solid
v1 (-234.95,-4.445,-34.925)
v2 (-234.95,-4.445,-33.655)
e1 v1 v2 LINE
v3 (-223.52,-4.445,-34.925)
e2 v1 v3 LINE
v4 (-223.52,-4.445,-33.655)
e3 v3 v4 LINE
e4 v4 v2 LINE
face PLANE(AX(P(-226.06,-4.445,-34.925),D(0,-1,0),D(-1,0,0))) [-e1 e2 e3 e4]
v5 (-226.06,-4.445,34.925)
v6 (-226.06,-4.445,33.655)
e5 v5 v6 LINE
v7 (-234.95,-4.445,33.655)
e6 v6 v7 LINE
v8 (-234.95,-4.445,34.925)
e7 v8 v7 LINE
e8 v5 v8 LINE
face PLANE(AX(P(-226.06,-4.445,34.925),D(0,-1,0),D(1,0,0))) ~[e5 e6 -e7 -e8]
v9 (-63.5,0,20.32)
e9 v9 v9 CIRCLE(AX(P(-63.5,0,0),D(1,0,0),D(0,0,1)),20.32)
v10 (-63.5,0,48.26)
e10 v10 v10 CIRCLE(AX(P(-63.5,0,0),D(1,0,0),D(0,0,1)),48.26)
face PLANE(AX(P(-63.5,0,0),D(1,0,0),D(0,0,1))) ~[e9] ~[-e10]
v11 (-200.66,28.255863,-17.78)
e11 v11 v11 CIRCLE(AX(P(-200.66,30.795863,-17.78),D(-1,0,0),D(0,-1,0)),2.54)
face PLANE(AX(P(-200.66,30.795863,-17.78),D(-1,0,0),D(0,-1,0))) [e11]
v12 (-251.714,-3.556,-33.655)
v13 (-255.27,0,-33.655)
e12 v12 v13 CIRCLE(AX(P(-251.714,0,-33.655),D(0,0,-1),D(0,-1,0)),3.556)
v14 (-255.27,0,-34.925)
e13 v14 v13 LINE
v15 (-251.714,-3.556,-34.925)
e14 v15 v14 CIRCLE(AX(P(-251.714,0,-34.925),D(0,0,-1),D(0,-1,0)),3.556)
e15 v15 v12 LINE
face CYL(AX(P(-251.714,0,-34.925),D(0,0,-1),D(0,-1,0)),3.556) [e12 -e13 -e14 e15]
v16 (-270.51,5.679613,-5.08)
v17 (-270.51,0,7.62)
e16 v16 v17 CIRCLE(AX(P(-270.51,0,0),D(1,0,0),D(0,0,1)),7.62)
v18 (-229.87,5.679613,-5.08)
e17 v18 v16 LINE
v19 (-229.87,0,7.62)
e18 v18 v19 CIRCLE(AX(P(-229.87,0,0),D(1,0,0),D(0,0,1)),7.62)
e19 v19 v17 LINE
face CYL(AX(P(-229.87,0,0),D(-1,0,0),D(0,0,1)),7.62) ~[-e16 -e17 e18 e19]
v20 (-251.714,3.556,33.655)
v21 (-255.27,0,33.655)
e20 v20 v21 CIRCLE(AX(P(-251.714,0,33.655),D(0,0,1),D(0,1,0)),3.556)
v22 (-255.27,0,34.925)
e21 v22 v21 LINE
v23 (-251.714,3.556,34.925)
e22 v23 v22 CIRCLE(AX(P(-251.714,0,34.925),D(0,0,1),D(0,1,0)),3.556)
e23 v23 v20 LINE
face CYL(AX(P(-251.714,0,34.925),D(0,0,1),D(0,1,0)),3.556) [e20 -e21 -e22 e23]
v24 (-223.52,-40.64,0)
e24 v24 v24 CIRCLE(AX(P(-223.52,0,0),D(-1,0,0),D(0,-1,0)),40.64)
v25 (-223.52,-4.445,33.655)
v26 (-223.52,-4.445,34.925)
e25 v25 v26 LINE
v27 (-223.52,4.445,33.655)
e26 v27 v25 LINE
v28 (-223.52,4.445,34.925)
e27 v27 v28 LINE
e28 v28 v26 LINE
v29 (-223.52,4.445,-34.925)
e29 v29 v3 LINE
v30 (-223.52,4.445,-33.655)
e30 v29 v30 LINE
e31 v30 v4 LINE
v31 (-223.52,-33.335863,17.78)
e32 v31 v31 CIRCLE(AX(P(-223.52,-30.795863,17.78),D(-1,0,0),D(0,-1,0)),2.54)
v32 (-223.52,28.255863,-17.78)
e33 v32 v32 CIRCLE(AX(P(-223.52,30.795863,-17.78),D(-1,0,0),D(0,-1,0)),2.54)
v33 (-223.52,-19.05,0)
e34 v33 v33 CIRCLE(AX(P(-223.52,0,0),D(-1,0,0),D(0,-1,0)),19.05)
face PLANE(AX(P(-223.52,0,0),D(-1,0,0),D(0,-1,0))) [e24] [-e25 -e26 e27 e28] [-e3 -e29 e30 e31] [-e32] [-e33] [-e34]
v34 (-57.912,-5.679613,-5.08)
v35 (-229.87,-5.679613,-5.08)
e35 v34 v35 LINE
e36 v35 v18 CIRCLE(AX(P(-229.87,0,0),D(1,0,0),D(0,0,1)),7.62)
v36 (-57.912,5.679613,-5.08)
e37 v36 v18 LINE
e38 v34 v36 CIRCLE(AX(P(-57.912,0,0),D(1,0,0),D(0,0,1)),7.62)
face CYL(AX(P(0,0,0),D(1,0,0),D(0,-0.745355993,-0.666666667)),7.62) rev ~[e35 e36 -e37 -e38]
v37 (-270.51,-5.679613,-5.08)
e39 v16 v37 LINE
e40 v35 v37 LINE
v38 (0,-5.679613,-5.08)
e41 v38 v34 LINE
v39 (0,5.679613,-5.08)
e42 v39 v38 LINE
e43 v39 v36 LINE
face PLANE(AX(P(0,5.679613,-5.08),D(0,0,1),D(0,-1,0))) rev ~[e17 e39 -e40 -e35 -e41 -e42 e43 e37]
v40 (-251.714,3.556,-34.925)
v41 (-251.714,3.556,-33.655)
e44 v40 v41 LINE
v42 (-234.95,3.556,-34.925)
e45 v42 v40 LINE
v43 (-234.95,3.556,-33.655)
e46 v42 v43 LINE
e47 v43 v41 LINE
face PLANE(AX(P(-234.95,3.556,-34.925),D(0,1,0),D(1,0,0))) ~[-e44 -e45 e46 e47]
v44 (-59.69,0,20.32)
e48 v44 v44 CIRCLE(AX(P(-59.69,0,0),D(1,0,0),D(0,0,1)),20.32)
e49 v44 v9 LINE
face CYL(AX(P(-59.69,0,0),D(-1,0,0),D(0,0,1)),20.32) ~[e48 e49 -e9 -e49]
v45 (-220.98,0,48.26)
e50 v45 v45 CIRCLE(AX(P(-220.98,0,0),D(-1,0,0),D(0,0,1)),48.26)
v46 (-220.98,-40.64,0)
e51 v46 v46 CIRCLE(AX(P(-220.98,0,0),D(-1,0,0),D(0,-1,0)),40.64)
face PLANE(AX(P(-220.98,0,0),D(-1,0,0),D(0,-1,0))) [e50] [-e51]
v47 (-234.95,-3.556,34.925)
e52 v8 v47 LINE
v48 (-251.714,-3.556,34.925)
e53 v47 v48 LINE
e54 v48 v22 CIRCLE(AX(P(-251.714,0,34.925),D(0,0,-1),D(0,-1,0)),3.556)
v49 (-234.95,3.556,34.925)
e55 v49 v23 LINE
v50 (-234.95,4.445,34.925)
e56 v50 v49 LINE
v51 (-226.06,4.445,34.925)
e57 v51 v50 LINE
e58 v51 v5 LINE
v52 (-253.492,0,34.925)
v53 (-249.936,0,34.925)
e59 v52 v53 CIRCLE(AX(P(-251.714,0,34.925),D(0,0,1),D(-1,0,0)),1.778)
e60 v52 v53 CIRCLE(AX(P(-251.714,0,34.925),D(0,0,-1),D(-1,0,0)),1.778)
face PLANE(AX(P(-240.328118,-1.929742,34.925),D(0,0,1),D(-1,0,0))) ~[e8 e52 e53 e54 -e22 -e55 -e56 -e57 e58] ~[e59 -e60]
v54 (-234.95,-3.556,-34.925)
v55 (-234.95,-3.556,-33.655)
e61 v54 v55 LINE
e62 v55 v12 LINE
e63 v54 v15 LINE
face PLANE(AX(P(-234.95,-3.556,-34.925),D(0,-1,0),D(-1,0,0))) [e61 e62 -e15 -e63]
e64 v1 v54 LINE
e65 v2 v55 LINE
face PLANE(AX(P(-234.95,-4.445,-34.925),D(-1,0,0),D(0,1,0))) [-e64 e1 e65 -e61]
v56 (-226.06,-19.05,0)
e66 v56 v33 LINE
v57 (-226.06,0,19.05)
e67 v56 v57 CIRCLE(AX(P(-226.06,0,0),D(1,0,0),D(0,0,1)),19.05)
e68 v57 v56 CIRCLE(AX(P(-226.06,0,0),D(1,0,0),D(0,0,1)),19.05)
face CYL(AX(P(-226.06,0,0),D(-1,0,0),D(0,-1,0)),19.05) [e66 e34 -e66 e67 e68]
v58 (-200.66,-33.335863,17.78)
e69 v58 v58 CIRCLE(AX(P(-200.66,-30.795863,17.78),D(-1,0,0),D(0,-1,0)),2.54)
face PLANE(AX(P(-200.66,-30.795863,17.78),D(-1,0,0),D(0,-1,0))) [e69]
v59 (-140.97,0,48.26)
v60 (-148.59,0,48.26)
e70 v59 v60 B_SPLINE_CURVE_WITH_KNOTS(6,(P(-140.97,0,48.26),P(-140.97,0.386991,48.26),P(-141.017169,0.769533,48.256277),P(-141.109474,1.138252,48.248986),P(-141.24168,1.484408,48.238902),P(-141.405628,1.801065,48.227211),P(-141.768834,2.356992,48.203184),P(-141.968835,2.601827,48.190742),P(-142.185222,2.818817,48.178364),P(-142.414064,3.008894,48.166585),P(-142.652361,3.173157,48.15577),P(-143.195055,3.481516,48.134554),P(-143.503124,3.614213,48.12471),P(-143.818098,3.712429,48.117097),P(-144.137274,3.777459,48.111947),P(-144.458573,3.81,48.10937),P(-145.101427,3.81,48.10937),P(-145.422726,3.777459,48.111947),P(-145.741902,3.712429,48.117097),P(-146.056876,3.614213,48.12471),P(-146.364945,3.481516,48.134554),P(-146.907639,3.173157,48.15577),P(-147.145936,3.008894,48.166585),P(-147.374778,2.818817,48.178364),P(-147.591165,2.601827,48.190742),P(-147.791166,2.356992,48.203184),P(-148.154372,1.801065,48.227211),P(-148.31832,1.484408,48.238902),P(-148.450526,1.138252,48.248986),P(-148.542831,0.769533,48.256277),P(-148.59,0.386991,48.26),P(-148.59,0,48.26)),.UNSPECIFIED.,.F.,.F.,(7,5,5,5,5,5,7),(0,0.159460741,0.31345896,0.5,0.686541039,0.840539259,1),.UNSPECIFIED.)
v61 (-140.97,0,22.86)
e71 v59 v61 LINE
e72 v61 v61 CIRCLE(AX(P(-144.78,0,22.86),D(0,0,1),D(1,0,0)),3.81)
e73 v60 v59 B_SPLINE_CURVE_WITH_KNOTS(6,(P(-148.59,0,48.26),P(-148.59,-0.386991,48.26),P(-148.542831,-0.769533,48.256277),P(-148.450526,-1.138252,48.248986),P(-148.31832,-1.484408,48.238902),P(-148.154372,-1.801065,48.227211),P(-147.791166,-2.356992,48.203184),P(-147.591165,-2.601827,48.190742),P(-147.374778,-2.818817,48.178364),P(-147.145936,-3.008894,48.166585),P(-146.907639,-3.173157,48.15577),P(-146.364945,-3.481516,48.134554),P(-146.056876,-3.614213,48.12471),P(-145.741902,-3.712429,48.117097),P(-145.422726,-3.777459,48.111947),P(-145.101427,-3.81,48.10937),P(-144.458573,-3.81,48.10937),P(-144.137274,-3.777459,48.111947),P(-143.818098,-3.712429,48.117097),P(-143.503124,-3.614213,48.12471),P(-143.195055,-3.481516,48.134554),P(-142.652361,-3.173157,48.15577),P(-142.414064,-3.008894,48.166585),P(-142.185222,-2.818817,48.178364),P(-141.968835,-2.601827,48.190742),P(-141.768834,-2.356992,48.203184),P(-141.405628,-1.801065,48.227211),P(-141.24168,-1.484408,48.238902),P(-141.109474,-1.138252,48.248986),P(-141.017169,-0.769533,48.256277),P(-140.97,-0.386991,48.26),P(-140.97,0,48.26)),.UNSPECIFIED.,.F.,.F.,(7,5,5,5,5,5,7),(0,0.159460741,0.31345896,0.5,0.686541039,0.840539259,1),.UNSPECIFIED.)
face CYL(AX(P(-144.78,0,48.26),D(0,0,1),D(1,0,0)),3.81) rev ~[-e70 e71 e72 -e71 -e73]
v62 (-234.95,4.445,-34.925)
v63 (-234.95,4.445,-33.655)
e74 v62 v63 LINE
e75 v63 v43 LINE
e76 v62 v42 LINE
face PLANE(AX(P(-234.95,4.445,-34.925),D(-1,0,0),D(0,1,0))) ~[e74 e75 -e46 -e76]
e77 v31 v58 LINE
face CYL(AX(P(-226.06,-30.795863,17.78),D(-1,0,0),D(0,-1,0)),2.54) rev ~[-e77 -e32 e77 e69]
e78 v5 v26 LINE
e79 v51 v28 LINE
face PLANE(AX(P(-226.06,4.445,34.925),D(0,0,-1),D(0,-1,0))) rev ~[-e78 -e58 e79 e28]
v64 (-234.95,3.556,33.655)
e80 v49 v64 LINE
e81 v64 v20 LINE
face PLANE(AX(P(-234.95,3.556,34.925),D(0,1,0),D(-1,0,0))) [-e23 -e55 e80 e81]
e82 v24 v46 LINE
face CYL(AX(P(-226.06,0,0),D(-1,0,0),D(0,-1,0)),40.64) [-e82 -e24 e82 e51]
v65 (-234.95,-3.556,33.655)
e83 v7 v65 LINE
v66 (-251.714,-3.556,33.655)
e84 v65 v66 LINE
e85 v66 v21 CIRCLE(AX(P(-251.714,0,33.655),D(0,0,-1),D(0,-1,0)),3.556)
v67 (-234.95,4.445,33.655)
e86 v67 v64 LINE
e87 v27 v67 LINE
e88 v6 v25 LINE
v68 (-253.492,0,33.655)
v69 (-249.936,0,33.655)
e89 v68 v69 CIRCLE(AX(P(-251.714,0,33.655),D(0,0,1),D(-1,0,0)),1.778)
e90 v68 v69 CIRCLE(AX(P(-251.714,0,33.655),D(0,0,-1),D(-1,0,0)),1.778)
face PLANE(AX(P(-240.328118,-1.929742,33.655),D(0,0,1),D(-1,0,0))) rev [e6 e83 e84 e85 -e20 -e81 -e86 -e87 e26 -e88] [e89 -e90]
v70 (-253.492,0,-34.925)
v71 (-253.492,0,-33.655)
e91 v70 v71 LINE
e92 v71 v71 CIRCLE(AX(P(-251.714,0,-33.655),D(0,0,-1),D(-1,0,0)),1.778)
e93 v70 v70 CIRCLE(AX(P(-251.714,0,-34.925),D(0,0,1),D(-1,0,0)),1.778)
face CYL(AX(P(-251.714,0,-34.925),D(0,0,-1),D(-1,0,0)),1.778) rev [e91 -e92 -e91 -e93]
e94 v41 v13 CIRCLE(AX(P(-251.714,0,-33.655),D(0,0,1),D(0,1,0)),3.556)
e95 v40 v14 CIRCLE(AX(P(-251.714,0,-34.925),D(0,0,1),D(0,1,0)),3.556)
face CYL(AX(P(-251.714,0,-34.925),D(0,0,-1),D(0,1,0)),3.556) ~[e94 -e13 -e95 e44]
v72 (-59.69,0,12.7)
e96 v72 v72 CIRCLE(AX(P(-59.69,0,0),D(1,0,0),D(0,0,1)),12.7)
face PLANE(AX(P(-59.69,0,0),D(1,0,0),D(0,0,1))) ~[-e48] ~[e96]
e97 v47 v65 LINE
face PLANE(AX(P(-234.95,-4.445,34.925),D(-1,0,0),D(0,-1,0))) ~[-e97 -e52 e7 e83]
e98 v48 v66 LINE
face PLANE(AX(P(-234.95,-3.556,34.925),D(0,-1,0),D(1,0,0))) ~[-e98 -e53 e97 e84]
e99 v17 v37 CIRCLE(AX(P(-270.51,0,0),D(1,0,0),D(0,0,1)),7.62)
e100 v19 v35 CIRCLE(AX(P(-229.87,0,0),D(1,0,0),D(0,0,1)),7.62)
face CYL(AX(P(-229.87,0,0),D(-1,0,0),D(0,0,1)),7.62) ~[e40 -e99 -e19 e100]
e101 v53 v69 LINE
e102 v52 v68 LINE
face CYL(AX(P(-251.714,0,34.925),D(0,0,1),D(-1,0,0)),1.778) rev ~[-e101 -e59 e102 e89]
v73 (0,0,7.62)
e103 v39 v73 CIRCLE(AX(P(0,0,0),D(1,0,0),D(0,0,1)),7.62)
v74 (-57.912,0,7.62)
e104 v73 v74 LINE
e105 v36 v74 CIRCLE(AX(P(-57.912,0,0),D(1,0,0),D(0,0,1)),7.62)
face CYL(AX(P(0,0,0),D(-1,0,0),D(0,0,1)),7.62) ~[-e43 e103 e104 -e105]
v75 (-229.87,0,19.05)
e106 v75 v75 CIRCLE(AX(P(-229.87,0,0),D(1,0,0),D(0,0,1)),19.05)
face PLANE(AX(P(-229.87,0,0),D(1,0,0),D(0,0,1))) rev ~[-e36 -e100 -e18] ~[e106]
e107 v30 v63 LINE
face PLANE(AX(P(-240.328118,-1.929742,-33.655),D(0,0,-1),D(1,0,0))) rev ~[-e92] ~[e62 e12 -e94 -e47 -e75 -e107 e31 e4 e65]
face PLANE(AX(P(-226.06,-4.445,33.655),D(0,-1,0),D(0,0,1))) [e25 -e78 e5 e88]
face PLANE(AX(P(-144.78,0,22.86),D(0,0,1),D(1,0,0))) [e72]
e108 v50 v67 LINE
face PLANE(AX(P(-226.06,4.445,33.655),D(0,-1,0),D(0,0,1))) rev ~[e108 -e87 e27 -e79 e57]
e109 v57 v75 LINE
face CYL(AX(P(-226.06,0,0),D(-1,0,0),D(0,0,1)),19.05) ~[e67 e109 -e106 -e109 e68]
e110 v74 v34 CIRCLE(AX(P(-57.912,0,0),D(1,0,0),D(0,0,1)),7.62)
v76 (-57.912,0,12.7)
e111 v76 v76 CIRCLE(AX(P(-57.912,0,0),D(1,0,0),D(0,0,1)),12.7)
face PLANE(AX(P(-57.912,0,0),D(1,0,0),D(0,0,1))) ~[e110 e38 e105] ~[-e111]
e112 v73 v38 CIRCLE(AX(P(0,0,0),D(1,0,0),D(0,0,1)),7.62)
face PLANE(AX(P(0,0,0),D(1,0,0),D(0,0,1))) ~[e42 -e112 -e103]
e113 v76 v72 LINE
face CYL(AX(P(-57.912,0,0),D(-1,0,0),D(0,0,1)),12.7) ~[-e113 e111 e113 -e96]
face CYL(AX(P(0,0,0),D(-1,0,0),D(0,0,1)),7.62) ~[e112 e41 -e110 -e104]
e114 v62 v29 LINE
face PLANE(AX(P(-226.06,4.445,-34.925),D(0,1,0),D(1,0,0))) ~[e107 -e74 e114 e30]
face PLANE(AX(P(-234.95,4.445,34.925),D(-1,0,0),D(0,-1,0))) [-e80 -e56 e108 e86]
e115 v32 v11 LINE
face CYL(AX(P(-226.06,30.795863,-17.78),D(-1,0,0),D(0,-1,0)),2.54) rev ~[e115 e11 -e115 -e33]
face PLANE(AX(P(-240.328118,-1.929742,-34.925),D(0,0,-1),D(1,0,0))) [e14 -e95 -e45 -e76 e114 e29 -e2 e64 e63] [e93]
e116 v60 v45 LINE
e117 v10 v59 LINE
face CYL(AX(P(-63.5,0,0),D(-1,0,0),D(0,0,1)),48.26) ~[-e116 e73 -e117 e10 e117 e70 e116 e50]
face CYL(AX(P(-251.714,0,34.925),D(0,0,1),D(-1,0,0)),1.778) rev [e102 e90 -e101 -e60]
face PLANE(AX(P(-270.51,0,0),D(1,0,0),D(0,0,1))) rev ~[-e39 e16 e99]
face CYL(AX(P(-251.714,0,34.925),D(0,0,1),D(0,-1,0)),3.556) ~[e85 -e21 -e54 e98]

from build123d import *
from build123d import SkipClean  # not in build123d's __all__

# Parameters (mm, degrees)
F5_DEPTH         = 1.27
F5_COPIES2_COUNT = 2
F7_R             = 3.81
F8_DEPTH         = 25.4
F9_R             = 2.54
F10_DEPTH        = 25.4
F9_R_2           = 40.64
F9_W             = 8.89
F9_H             = 1.27
F9_R_3           = 19.05
F11_DEPTH        = 2.54
F12_R            = 48.26
F12_R_2          = 40.64
F13_DEPTH        = 5.08
F15_DEPTH        = 270.51


# Not quite as in the source:
# - after a boolean that leaves OpenCascade's solid faulty, fix() repairs it
# - a pattern or mirror of a feature is missing from the dataset's text; its kind, count and spacing are read off the source's solid


with BuildPart() as f1:
    # F0 (on Front) → F1 (revolve)
    with BuildSketch(Plane.XZ):
        Polygon((-270.51, 0), (0, 0), (0, 7.62), (-57.912, 7.62), (-57.912, 12.7), (-59.69, 12.7), (-59.69, 20.32), (-63.5, 20.32), (-63.5, 48.26), (-226.06, 48.26), (-226.06, 19.05), (-229.87, 19.05), (-229.87, 7.62), (-270.51, 7.62), align=None)
    revolve(axis=Axis((-130.6665660813, 0, 0), (1, 0, 0)))

    # F4 (on offset) → F5 (join)
    with BuildSketch(Plane.XY.offset(34.925)):
        with BuildLine():
            Line((-226.06, 0), (-226.06, 4.445))
            Line((-226.06, 4.445), (-234.95, 4.445))
            Line((-234.95, 4.445), (-234.95, 3.556))
            Line((-234.95, 3.556), (-251.714, 3.556))
            ThreePointArc((-251.714, 3.556), (-254.2284717139, 2.5144717139), (-255.27, 0))
            Line((-255.27, 0), (-253.492, 0))
            ThreePointArc((-253.492, 0), (-251.714, 1.778), (-249.936, 0))
            Line((-249.936, 0), (-226.06, 0))
        make_face()
    f5 = extrude(amount=-F5_DEPTH)

    # F5_copies: F5 across plane
    add(f5.mirror(Plane(origin=(0, 0, 0), x_dir=(-1, 0, 0), z_dir=(0, 0, -1))), clean=False)

    # F5_copies1: F5 across plane
    with SkipClean():  # cleaning this boolean's faces spoils the solid; the shape is the same uncleaned
        add(f5.mirror(Plane(origin=(0, 0, 0), x_dir=(0, 0, -1), z_dir=(0, -1, 0))), clean=False)

    # F5_copies2: F5 ×2 about axis
    f5_copies2_axis = Axis((0, 0, 0), (1, 0, 0))
    with SkipClean():  # cleaning this boolean's faces spoils the solid; the shape is the same uncleaned
        for i in range(1, F5_COPIES2_COUNT):
            add(f5.rotate(f5_copies2_axis, i * 360 / F5_COPIES2_COUNT), clean=False)

    # F7 (on offset) → F8 (cut)
    with BuildSketch(Plane.XY.offset(48.26)):
        with Locations((-144.78, 0)):
            Circle(F7_R)
    extrude(amount=-F8_DEPTH, mode=Mode.SUBTRACT)

    # F9 (on face) → F10 (cut)
    with BuildSketch(Plane(origin=(-226.06, 0, 0), x_dir=(0, -1, 0), z_dir=(-1, 0, 0))):
        with Locations((30.7958633586, 17.78)):
            Circle(F9_R)
        with Locations((-30.7958633586, -17.78)):
            Circle(F9_R)
    extrude(amount=-F10_DEPTH, mode=Mode.SUBTRACT)

    # F9 (on face) → F11 (cut)
    with BuildSketch(Plane(origin=(-226.06, 0, 0), x_dir=(0, -1, 0), z_dir=(-1, 0, 0))):
        Circle(F9_R_2)
        with Locations((-30.7958633586, -17.78)):
            Circle(F9_R, mode=Mode.SUBTRACT)
        with Locations((0, -34.29)):
            Rectangle(F9_W, F9_H, mode=Mode.SUBTRACT)
        Circle(F9_R_3, mode=Mode.SUBTRACT)
        with Locations((30.7958633586, 17.78)):
            Circle(F9_R, mode=Mode.SUBTRACT)
        with Locations((0, 34.29)):
            Rectangle(F9_W, F9_H, mode=Mode.SUBTRACT)
    with SkipClean():  # cleaning this boolean's faces spoils the solid; the shape is the same uncleaned
        extrude(amount=-F11_DEPTH, mode=Mode.SUBTRACT)

    # F12 (on face) → F13 (cut)
    with BuildSketch(Plane(origin=(-226.06, 0, 0), x_dir=(0, -1, 0), z_dir=(-1, 0, 0))):
        Circle(F12_R)
        Circle(F12_R_2, mode=Mode.SUBTRACT)
    extrude(amount=-F13_DEPTH, mode=Mode.SUBTRACT)

    add(f1.part.fix(), mode=Mode.REPLACE)

    # F14 (on face) → F15 (cut, through all)
    with BuildSketch(Plane.YZ):
        with BuildLine():
            Line((5.6796126628, -5.08), (-5.6796126628, -5.08))
            ThreePointArc((-5.6796126628, -5.08), (0, -7.62), (5.6796126628, -5.08))
        make_face()
    extrude(amount=-F15_DEPTH, mode=Mode.SUBTRACT)

    add(f1.part.fix(), mode=Mode.REPLACE)


solid = f1.part
